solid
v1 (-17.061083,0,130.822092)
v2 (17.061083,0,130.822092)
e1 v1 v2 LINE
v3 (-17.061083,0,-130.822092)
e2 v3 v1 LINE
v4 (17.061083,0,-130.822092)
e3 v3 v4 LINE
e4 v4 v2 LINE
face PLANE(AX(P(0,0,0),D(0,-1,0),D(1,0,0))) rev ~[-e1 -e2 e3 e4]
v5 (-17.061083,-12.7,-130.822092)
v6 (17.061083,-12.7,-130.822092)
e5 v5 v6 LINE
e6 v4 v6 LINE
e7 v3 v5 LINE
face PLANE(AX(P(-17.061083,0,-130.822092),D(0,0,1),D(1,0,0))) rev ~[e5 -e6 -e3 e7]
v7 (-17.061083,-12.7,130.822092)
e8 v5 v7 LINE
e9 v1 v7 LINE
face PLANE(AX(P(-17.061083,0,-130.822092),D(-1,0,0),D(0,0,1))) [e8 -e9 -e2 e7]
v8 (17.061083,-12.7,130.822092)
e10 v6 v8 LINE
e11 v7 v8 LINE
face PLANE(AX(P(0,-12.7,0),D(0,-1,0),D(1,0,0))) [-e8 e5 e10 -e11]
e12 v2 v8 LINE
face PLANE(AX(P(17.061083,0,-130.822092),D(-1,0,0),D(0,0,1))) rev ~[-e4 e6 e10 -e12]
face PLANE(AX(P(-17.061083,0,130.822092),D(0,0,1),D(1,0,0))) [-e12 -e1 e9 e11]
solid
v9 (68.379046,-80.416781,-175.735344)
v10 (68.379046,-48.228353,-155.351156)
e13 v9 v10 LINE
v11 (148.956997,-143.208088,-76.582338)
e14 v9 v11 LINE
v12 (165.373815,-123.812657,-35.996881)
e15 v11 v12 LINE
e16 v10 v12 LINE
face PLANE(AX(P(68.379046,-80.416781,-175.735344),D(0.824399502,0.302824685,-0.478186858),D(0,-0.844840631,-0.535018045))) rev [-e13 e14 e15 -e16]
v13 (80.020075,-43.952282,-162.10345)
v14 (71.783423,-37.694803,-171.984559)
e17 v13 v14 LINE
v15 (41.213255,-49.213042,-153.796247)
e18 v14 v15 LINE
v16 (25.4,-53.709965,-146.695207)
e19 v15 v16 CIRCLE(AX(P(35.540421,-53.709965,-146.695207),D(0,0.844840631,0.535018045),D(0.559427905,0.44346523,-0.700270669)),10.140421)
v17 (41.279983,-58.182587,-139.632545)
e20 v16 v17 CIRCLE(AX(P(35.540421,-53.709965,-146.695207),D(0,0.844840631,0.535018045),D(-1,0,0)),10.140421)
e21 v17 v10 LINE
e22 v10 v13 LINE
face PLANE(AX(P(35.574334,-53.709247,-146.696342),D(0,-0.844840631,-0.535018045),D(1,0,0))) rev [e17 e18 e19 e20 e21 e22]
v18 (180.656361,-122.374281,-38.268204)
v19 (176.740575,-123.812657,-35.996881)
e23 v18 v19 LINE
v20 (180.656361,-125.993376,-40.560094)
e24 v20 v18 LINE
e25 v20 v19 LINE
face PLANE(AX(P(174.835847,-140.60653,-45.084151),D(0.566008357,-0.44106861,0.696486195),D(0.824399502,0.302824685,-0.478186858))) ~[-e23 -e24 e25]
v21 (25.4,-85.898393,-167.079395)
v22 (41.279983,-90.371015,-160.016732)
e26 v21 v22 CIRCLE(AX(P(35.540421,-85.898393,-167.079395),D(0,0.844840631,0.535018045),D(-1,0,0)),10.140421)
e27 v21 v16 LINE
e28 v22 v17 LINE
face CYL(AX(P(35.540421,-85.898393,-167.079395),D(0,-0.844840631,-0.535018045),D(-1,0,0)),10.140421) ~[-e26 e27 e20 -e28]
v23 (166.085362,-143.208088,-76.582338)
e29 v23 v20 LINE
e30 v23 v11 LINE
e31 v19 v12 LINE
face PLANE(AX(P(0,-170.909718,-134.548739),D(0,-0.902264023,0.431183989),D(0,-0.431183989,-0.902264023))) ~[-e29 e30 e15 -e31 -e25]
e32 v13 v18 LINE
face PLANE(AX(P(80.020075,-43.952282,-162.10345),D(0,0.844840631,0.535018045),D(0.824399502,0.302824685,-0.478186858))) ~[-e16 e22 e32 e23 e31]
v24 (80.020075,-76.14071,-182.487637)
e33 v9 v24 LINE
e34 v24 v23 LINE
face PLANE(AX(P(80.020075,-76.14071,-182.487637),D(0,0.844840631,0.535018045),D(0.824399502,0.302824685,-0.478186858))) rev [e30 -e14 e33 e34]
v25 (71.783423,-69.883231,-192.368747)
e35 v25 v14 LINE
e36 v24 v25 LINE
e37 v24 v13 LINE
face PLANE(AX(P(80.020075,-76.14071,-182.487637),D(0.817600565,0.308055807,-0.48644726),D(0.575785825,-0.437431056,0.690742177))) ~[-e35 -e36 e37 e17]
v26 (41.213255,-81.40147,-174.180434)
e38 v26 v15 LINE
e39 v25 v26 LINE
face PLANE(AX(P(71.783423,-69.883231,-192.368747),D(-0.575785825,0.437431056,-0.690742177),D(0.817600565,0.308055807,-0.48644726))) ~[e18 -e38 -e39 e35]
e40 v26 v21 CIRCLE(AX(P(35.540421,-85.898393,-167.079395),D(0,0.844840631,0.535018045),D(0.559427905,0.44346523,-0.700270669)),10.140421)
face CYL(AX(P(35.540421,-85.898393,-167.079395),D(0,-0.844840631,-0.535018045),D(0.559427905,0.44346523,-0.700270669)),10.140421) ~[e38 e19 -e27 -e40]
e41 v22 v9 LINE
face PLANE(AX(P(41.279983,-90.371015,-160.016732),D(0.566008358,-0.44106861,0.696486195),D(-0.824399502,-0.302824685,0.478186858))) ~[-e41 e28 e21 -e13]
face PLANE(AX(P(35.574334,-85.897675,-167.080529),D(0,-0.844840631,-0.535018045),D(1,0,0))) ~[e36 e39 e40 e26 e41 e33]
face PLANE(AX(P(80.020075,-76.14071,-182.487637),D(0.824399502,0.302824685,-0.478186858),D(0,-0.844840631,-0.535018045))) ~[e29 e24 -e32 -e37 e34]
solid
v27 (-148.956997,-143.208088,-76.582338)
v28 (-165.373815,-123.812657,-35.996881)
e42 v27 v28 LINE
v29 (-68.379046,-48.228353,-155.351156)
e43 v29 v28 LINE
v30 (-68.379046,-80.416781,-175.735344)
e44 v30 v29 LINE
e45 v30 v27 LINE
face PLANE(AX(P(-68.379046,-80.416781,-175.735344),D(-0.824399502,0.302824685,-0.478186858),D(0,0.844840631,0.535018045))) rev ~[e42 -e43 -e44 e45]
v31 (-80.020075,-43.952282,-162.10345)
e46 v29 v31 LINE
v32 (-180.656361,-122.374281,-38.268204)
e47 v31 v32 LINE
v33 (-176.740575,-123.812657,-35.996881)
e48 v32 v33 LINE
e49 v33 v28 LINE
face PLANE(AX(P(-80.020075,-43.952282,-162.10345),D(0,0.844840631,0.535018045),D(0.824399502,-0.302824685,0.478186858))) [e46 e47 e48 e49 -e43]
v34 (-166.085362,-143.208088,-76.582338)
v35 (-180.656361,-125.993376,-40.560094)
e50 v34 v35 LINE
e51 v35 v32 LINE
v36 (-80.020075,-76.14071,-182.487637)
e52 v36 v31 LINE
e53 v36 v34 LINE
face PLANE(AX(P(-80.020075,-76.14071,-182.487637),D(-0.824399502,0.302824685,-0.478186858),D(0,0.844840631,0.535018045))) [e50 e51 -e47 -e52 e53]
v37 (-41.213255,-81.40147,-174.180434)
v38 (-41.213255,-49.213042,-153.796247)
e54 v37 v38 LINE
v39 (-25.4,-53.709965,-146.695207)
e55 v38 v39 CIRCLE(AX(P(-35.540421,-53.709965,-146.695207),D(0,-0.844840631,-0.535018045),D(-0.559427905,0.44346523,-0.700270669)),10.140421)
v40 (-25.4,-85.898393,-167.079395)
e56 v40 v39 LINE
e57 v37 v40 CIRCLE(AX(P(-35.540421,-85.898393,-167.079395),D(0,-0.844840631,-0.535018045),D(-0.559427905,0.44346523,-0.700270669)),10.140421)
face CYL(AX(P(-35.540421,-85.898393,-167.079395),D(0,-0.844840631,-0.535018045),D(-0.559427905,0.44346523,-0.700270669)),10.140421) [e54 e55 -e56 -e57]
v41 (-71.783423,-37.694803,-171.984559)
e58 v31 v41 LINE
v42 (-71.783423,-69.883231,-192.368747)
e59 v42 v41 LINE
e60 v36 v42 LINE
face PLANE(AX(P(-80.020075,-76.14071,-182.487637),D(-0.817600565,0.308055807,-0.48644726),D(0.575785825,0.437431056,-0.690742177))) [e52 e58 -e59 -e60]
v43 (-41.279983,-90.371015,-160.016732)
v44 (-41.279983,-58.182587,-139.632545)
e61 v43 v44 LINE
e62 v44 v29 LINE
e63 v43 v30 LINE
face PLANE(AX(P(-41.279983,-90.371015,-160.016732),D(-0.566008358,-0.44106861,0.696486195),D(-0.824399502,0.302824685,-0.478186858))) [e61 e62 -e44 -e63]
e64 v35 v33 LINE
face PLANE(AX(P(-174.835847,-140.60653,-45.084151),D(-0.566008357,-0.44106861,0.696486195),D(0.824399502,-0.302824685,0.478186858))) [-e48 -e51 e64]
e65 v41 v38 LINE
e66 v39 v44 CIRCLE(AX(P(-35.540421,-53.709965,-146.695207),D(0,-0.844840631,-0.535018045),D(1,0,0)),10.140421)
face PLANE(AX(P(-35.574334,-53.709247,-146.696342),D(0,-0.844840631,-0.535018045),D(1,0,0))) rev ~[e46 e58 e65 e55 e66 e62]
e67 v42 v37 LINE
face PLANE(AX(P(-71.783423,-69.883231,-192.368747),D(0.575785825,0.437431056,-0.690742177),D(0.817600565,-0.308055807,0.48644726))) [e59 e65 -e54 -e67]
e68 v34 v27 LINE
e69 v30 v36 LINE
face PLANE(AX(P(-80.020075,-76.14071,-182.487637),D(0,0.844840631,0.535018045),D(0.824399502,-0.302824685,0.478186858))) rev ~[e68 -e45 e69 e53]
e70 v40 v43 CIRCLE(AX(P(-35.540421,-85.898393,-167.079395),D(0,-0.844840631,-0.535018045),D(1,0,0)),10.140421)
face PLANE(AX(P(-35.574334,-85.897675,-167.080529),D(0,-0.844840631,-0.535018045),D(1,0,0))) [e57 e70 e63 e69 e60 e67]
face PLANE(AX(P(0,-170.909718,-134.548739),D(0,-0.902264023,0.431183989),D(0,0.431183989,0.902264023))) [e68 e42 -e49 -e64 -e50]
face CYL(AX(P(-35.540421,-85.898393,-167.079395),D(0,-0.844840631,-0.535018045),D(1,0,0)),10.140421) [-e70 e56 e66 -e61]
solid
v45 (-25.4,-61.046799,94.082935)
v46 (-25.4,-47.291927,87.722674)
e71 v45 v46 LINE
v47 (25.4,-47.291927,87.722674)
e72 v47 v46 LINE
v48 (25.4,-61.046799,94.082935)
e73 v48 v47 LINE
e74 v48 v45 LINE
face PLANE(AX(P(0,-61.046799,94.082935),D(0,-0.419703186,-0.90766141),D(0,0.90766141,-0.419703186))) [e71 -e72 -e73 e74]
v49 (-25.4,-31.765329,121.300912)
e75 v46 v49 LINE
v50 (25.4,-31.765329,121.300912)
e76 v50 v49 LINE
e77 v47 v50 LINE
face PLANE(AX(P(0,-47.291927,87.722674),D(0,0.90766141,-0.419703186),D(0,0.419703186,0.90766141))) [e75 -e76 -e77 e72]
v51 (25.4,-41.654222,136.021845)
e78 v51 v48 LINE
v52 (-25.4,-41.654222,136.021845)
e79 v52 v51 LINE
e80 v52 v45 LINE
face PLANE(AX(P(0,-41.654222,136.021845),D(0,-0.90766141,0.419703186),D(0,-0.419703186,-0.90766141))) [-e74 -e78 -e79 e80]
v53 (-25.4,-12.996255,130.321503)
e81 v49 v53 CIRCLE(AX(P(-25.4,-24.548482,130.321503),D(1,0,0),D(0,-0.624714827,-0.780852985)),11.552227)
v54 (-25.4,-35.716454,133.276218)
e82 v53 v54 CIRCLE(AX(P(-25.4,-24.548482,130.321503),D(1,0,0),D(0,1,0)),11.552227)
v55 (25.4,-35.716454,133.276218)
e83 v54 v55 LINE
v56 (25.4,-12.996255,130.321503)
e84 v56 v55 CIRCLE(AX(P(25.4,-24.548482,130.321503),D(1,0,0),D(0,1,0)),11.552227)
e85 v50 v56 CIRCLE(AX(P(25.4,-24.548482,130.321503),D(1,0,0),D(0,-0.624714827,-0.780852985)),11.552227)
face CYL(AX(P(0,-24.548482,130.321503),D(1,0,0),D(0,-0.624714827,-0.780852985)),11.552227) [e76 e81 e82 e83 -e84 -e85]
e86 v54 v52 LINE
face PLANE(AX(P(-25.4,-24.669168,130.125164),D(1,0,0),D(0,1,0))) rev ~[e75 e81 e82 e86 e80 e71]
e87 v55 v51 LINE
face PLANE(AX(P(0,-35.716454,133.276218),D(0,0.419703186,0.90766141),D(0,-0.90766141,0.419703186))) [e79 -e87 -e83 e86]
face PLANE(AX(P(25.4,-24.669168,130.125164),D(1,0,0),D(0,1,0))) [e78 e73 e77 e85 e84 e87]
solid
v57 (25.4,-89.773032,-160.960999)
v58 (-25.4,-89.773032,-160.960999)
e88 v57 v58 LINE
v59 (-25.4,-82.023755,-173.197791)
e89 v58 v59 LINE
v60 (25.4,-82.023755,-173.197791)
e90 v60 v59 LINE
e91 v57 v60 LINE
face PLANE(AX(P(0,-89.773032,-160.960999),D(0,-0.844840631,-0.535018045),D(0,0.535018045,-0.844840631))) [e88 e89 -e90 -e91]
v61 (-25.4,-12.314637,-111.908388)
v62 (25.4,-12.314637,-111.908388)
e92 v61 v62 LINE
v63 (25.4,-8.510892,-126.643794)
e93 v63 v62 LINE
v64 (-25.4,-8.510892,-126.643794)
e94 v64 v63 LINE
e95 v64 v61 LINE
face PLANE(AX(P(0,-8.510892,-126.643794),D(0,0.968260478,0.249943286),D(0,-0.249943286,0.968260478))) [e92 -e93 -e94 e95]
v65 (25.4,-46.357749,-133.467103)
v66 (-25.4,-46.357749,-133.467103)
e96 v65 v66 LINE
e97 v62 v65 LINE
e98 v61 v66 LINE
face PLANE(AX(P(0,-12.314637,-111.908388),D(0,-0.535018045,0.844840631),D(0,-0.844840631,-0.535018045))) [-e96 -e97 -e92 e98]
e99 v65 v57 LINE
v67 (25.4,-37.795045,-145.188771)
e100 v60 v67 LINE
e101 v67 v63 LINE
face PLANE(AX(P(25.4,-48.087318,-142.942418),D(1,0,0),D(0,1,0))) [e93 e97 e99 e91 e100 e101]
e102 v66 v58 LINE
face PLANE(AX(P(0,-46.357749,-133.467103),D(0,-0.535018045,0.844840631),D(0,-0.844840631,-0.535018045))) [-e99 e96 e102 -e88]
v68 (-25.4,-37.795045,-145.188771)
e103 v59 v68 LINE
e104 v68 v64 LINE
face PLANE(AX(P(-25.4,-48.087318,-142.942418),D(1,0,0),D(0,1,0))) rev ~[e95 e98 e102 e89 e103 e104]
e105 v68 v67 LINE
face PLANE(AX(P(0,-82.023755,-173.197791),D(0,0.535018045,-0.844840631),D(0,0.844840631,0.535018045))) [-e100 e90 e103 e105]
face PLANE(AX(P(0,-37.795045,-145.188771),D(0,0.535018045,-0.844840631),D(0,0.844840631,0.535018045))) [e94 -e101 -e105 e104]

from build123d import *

# Parameters (mm, degrees)
F0_W           = 34.1221652925
F0_H           = 261.6441845894
F1_DEPTH       = 12.7
F3_DEPTH       = 25.4
F3_DEPTH_BACK  = 25.4
F7_DEPTH       = 25.4
F7_DEPTH_BACK  = 25.4
F9_DEPTH       = 38.1
F11_W          = 14.1206162959
F11_H          = 38.1
F12_DEPTH      = 177.8
F15_DEPTH      = 508
F15_DEPTH_BACK = 508
F20_DEPTH      = 228.6
F20_DEPTH_BACK = 228.6


with BuildPart() as f1:
    # F0 (on Front) → F1 (new body)
    with BuildSketch(Plane.XZ):
        Rectangle(F0_W, F0_H)
    extrude(amount=F1_DEPTH)


with BuildPart() as f3:
    # F2 (on Right) → F3 (new body, two sides)
    with BuildSketch(Plane.YZ) as f3_sk:
        with BuildLine():
            ThreePointArc((-31.7653294782, 121.3009119591), (-19.5443195923, 119.9093799667), (-12.9962554201, 130.3215026855))
            ThreePointArc((-12.9962554201, 130.3215026855), (-23.058684097, 141.777262991), (-35.7164542609, 133.2762177888))
            ThreePointArc((-35.7164542609, 133.2762177888), (-35.5190055596, 126.7018951749), (-31.7653294782, 121.3009119591))
        make_face()
        with BuildLine():
            ThreePointArc((-31.7653294782, 121.3009119591), (-35.5190055596, 126.7018951749), (-35.7164542609, 133.2762177888))
            Line((-35.7164542609, 133.2762177888), (-41.654221951, 136.0218451646))
            Line((-41.654221951, 136.0218451646), (-61.046799285, 94.0829352683))
            Line((-61.046799285, 94.0829352683), (-47.2919270396, 87.7226740122))
            Line((-47.2919270396, 87.7226740122), (-31.7653294782, 121.3009119591))
        make_face()
    extrude(amount=F3_DEPTH)
    extrude(f3_sk.sketch, amount=-F3_DEPTH_BACK)


with BuildPart() as f4_1:
    # F4: instance of F3
    add(f3.part.mirror(Plane.XY))


with BuildPart() as f7:
    # F6 (on Right) → F7 (new body, two sides)
    with BuildSketch(Plane.YZ) as f7_sk:
        Polygon((-82.0237547159, -173.1977909803), (-37.7950449612, -145.1887713173), (-8.5108920135, -126.643794078), (-12.3146369824, -111.9083875607), (-46.3577486399, -133.4671033607), (-89.7730322343, -160.9609990365), align=None)
    extrude(amount=F7_DEPTH)
    extrude(f7_sk.sketch, amount=-F7_DEPTH_BACK)


with BuildPart() as f9:
    # F8 (on face) → F9 (new body)
    with BuildSketch(Plane(origin=(0, -136.8311862758, -86.652027793), x_dir=(1, 0, 0), z_dir=(0, -0.8448406307, -0.5350180453))):
        with BuildLine():
            ThreePointArc((-41.2132547892, -103.603452681), (-30.7810506283, -104.152405518), (-25.4, -95.198270886))
            ThreePointArc((-25.4, -95.198270886), (-30.8167276914, -86.225263874), (-41.2799833491, -86.8385132228))
            ThreePointArc((-41.2799833491, -86.8385132228), (-45.680760801, -95.2386319206), (-41.2132547892, -103.603452681))
        make_face()
        with BuildLine():
            ThreePointArc((-41.2132547892, -103.603452681), (-45.680760801, -95.2386319206), (-41.2799833491, -86.8385132228))
            Line((-41.2799833491, -86.8385132228), (-80.0200754217, -113.4363166259))
            Line((-80.0200754217, -113.4363166259), (-71.7834234238, -125.1321434975))
            Line((-71.7834234238, -125.1321434975), (-41.2132547892, -103.603452681))
        make_face()
    extrude(amount=-F9_DEPTH)


with BuildPart() as f10_1:
    # F10: instance of F9
    add(f9.part.mirror(Plane.YZ))


with BuildPart() as f9_1:
    add(f9.part)

    # F11 (on face) → F12 (join)
    with BuildSketch(Plane(origin=(27.2956463477, 21.2704505823, -33.5879154814), x_dir=(0.8243995022, -0.302824685, 0.4781868578), z_dir=(-0.5660083575, -0.4410686102, 0.6964861954))):
        with Locations((-123.1141054526, -142.9109442375)):
            Rectangle(F11_W, F11_H)
    extrude(amount=F12_DEPTH)


with BuildPart() as f13_1:
    # F13: instance of F9
    add(f9_1.part.mirror(Plane.YZ))


with BuildPart() as f15_tool:
    # F14 (on Right) → F15 (new body, two sides)
    with BuildSketch(Plane.YZ) as f15_sk:
        Polygon((-170.909717679, -134.5487385988), (-87.3836744508, 40.231739617), (-170.909717679, 47.1544340253), align=None)
    extrude(amount=-F15_DEPTH)
    extrude(f15_sk.sketch, amount=F15_DEPTH_BACK)


with BuildPart() as f9_2:
    add(f9_1.part)

    # F15: cut by f15_tool
    add(f15_tool.part, mode=Mode.SUBTRACT)


with BuildPart() as f13_1_1:
    add(f13_1.part)

    # F15: cut by f15_tool
    add(f15_tool.part, mode=Mode.SUBTRACT)


with BuildPart() as f18_1:
    # F18: instance of F9
    add(f9_2.part.mirror(Plane.YZ))


with BuildPart() as f20:
    # F19 (on Right) → F20 (new body, two sides)
    with BuildSketch(Plane.YZ) as f20_sk:
        Polygon((-175.9073315984, -141.5651084215), (-144.9963003397, -76.4395818114), (-43.3924645185, 137.6264989376), (-107.6736316351, 168.8955078974), (-240.4824132121, -110.9153391191), align=None)
    extrude(amount=F20_DEPTH)
    extrude(f20_sk.sketch, amount=-F20_DEPTH_BACK)


solid = Compound([f1.part, f3.part, f7.part, f9_2.part, f18_1.part])
